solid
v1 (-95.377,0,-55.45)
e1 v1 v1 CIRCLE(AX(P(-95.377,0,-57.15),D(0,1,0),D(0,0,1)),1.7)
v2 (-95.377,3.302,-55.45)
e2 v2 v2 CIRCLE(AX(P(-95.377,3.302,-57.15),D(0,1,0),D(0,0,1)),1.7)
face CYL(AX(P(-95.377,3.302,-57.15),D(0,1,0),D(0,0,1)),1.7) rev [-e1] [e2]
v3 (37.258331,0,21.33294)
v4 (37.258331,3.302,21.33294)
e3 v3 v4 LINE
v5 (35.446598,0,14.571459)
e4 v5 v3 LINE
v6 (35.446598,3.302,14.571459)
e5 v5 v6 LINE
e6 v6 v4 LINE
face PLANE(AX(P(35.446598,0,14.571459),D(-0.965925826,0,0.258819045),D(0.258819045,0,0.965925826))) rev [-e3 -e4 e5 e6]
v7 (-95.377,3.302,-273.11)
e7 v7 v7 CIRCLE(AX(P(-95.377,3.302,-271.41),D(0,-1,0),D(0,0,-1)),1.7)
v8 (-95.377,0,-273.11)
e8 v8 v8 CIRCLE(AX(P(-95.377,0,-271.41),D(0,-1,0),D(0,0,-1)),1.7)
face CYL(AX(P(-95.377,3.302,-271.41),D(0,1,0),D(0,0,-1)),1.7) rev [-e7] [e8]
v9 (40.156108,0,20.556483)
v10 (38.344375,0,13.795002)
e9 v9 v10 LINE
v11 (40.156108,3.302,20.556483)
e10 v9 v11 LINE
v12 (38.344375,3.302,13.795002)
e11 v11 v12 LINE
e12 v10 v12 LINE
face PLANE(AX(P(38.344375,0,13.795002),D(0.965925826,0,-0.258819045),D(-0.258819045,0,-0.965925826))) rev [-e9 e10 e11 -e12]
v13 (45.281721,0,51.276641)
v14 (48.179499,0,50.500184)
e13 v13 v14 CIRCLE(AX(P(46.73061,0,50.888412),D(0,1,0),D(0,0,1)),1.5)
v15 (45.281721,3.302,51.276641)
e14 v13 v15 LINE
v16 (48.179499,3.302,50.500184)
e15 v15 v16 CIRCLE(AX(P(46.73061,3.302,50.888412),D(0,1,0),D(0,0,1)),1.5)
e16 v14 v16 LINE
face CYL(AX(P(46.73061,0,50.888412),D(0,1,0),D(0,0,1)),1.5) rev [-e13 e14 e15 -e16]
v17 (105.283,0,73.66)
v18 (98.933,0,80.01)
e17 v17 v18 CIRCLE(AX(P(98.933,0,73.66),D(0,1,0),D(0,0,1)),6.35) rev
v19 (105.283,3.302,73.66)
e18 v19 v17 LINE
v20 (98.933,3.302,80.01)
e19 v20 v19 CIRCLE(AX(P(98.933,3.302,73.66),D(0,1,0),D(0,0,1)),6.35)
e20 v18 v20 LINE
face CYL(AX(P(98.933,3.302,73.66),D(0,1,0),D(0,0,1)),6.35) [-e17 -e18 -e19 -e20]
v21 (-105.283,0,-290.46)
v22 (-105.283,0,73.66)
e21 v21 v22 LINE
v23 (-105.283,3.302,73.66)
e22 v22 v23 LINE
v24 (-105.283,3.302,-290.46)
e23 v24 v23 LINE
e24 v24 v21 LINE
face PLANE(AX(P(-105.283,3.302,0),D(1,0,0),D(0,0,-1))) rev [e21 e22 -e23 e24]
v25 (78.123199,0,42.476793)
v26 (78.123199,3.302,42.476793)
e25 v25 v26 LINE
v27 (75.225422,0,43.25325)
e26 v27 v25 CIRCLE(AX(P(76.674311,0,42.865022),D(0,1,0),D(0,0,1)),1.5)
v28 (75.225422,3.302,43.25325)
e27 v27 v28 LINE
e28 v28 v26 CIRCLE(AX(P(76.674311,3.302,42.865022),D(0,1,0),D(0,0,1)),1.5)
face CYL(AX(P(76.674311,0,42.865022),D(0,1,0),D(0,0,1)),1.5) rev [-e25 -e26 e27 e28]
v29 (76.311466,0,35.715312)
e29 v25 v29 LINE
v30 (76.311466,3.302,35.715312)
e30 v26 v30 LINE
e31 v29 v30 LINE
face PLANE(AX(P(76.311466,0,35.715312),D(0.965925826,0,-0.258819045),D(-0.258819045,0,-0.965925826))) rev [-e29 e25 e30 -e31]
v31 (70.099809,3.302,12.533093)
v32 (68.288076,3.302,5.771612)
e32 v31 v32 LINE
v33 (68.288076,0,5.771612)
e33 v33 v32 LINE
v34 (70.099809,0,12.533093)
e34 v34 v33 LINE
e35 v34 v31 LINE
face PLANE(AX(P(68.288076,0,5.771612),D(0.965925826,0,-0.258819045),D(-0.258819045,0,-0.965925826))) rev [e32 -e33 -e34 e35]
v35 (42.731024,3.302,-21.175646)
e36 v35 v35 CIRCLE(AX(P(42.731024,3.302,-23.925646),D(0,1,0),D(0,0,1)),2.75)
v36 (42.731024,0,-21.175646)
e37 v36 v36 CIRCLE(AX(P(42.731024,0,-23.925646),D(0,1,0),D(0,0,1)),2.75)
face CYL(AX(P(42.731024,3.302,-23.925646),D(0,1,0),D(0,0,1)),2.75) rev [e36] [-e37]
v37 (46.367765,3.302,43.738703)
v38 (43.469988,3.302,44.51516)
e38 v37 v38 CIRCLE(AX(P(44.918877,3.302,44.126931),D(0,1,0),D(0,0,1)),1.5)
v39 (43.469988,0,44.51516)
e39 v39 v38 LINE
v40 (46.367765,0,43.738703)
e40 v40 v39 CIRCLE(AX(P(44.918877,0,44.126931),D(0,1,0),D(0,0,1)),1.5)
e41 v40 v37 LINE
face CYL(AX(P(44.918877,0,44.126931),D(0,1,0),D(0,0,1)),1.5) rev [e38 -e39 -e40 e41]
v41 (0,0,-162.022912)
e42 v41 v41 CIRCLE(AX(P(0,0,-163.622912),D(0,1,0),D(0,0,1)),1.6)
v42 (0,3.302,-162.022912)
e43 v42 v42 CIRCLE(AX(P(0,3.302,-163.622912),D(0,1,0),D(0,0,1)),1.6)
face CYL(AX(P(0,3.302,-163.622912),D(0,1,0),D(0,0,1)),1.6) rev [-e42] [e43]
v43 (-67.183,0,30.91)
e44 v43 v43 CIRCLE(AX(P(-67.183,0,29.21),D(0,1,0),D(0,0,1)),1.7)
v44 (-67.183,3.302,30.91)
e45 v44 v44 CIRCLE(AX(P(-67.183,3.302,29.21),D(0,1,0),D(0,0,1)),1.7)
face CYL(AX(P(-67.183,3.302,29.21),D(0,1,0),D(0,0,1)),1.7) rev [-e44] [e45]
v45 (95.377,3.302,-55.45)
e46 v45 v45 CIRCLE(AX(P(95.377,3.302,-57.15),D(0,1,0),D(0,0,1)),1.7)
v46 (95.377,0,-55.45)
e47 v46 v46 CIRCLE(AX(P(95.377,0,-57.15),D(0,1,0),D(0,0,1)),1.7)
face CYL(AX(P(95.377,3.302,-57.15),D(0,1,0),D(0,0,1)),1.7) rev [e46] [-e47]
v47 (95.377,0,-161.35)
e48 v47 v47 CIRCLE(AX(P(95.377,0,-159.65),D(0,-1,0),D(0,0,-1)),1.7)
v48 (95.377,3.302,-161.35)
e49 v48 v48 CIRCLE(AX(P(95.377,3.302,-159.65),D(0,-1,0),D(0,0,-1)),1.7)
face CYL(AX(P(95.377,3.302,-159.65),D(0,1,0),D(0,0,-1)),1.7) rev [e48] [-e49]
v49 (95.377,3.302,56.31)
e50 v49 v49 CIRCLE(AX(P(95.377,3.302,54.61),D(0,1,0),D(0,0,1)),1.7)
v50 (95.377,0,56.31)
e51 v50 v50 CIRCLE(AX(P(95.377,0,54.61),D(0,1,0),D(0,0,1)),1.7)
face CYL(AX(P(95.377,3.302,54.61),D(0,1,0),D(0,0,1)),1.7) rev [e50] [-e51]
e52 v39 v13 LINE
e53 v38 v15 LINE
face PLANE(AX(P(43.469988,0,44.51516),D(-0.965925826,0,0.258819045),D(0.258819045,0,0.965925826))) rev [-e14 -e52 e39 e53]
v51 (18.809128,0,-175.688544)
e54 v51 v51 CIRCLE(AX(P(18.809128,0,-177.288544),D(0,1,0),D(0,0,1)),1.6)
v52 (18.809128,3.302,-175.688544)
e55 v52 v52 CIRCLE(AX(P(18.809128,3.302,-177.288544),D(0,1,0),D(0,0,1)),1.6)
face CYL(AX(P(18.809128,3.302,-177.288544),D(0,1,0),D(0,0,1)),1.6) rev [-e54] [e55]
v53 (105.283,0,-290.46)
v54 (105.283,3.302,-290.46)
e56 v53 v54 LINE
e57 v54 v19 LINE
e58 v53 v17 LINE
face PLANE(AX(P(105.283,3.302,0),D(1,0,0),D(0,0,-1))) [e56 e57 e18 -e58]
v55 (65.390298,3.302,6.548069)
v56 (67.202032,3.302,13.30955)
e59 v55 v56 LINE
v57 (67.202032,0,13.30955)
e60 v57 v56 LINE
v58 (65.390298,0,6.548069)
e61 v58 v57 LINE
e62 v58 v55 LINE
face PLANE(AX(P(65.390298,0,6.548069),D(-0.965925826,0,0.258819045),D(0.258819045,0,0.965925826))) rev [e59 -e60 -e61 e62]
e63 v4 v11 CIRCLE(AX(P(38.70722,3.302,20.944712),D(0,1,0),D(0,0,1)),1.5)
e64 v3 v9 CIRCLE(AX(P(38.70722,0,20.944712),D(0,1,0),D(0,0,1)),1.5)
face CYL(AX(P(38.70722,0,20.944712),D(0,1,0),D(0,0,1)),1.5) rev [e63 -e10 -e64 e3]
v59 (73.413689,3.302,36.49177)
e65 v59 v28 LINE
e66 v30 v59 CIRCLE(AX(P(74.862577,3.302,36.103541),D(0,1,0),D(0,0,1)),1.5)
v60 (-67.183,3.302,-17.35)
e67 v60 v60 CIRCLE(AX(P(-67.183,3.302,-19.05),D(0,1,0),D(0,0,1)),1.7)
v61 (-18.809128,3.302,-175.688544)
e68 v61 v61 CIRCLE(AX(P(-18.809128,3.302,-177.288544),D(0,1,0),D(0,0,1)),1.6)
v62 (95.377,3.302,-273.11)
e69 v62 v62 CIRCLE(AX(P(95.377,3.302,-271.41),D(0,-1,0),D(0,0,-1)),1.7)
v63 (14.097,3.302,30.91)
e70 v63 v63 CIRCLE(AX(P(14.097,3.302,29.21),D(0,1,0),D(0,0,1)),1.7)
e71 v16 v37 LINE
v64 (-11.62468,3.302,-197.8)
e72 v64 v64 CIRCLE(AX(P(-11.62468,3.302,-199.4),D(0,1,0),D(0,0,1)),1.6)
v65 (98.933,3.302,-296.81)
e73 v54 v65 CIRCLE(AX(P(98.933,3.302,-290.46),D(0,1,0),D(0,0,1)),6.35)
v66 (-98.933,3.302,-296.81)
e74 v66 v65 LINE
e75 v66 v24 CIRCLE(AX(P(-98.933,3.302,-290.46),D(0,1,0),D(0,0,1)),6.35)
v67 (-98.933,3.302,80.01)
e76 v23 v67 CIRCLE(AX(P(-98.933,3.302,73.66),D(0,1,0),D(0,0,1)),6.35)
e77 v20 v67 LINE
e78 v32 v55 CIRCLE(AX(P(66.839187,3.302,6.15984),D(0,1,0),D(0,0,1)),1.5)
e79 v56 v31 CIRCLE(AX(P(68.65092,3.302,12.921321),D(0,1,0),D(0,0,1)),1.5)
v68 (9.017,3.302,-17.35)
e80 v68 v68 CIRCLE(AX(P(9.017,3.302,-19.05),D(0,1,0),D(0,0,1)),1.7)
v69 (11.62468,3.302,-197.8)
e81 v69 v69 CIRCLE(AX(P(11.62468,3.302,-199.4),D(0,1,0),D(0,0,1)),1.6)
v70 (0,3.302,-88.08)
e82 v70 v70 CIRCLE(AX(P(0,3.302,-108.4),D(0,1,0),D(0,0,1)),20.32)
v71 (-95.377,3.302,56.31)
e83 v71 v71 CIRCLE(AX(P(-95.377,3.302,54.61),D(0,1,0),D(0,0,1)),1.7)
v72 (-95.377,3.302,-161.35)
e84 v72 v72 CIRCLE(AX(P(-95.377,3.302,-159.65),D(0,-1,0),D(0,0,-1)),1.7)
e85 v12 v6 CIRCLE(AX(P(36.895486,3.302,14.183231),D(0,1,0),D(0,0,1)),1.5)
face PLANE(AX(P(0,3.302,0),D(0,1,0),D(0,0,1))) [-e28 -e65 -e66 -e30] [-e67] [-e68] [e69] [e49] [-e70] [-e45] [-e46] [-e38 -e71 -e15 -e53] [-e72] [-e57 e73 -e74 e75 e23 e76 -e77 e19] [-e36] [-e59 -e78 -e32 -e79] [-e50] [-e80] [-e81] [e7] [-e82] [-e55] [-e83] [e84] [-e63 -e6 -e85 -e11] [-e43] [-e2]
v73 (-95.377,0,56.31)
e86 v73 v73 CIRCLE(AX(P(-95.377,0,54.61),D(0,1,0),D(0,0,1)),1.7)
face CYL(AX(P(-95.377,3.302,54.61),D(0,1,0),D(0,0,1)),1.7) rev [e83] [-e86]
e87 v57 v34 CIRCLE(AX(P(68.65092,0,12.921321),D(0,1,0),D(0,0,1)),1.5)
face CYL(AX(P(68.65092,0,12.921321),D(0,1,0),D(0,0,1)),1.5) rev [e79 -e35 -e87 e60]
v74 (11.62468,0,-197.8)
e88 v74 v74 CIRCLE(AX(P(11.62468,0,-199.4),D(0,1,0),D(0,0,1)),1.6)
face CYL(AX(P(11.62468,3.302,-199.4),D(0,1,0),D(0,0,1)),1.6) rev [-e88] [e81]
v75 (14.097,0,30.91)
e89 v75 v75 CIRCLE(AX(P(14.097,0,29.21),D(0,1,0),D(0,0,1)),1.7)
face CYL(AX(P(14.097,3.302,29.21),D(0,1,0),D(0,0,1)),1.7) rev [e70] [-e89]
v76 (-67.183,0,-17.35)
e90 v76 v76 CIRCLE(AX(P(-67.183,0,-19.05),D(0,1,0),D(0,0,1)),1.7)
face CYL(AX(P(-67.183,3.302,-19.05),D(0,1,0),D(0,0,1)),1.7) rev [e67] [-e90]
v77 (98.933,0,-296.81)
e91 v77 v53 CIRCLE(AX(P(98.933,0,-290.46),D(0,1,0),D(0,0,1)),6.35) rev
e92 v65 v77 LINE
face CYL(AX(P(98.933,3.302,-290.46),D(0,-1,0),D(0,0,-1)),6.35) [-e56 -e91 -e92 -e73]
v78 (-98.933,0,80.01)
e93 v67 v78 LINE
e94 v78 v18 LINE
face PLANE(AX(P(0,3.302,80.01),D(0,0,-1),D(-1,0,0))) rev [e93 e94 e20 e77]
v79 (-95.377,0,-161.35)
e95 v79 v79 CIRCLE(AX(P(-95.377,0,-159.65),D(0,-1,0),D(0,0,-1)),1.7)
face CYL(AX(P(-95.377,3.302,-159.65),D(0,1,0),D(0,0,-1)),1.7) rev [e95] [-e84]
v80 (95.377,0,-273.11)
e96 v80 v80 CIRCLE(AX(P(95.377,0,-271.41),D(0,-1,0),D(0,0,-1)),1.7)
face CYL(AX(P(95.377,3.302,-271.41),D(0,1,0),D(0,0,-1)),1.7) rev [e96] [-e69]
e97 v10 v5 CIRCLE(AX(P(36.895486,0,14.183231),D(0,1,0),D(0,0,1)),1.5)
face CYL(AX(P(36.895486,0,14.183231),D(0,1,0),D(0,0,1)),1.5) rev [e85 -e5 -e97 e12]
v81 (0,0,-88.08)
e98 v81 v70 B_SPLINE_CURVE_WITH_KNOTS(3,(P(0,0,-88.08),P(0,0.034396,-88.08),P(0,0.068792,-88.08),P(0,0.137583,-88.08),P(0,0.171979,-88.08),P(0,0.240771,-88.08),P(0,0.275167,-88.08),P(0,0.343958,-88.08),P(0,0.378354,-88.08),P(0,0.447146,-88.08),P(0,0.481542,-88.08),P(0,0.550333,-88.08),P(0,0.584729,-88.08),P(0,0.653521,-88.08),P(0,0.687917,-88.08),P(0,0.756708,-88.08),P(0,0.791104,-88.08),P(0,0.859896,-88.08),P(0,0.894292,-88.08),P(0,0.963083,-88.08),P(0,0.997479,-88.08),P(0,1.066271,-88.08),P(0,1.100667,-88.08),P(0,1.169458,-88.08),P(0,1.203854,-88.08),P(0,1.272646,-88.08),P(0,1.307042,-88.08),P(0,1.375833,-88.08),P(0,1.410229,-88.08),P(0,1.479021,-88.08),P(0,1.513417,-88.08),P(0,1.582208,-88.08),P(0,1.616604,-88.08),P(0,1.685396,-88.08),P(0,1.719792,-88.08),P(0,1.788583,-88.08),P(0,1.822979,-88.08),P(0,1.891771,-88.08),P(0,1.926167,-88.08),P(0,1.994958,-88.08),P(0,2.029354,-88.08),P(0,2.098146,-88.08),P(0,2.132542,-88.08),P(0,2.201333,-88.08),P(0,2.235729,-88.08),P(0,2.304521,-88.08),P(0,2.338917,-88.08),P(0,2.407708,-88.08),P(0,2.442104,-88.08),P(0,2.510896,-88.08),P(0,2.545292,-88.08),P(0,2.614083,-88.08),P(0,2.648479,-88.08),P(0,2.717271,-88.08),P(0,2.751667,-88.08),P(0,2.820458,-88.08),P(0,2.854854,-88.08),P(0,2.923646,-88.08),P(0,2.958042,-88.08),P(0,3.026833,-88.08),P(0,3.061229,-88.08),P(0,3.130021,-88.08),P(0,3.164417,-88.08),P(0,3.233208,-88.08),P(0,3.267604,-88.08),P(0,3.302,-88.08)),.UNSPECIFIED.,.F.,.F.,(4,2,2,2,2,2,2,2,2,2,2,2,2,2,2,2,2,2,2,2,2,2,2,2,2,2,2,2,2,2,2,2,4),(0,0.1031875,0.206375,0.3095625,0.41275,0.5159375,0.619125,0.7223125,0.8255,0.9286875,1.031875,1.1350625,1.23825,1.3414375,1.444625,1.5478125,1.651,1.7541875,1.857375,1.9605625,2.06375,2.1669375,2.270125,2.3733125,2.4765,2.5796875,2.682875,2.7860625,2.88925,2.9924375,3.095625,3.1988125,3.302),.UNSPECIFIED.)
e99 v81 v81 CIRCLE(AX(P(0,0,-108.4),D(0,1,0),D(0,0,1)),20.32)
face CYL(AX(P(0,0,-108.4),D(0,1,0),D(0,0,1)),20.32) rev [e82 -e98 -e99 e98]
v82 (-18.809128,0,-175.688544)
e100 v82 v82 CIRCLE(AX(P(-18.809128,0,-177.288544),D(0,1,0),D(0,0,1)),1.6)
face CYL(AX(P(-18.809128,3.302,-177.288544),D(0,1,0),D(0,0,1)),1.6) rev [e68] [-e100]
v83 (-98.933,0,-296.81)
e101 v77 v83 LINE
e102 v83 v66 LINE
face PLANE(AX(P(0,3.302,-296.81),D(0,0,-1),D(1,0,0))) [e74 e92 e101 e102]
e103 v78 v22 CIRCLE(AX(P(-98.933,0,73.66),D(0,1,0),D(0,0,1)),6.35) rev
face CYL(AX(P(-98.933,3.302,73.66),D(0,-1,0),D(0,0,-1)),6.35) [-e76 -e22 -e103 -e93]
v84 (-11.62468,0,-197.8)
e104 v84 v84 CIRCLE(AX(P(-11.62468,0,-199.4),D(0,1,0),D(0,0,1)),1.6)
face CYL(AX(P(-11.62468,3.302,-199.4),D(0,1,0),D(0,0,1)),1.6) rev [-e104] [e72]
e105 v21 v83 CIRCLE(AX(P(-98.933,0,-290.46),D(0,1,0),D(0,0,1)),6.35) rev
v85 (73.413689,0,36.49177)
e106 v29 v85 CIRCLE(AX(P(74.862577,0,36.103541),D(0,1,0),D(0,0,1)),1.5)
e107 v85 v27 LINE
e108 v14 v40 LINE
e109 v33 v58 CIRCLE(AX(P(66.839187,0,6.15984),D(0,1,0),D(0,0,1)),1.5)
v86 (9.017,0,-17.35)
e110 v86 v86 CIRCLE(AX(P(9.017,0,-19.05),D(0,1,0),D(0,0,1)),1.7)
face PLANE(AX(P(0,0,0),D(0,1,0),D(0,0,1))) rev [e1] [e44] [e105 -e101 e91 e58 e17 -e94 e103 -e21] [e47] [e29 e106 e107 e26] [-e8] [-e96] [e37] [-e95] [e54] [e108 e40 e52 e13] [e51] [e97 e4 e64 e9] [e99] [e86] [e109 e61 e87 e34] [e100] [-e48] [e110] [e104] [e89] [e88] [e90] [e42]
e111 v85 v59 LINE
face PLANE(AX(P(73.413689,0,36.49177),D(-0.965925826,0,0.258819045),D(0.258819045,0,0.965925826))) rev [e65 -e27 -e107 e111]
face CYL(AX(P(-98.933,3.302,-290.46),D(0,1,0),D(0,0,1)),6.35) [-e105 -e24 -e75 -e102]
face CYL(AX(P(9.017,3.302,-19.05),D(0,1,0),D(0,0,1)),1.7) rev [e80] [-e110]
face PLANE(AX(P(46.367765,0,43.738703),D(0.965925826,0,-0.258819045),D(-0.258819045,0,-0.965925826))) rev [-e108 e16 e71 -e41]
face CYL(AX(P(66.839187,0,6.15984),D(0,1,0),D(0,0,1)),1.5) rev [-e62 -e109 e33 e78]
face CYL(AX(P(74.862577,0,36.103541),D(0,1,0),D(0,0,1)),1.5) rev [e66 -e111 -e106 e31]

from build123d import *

# Parameters (mm, degrees)
BOSS_EXTRUDE1_DEPTH     = 3.302
M3_CLEARANCE_HOLE1_D    = 3.4
SKETCH6_W               = 210.566
SKETCH6_H               = 3.302
BOSS_EXTRUDE3_DEPTH     = 1.62
SKETCH7_W               = 210.566
SKETCH7_H               = 3.302
BOSS_EXTRUDE4_DEPTH     = 5.18
M3_CLEARANCE_HOLE2_D    = 3.4
SKETCH21_R              = 20.32
CUT_EXTRUDE1_DEPTH      = 336.371396057
ADVANCEDHOLE1_OUTLINE_R = 1.6
ADVANCEDHOLE1_DEPTH     = 3.302
CUT_EXTRUDE2_REACH      = 337.371
SKETCH33_W              = 167.386
SKETCH33_H              = 21.59
FILLET1_R               = 6.35
CUT_EXTRUDE3_DEPTH      = 315.946962825
M5_CLEARANCE_HOLE1_D    = 5.5
M3_CLEARANCE_HOLE3_D    = 3.4


# Read off the part's stored shape, not the designer's step: AdvancedHole1
with BuildPart() as part:
    # Sketch1 → Boss-Extrude1 (new body)
    with BuildSketch(Plane(origin=(0, 0, 0), x_dir=(1, 0, 0), z_dir=(0, 1, 0))):
        Polygon((105.283, -80.01), (105.283, 101.6), (-105.283, 101.6), (-105.283, -80.01), (-83.693, -80.01), (-83.693, -101.6), (83.693, -101.6), (83.693, -80.01), align=None)
    extrude(amount=BOSS_EXTRUDE1_DEPTH)

    # M3 Clearance Hole1 (through all)
    with Locations(Plane(origin=(0, 3.302, 0), x_dir=(1, 0, 0), z_dir=(0, 1, 0))):
        with Locations((-95.377, -54.61), (-95.377, 57.15), (95.377, 57.15), (95.377, -54.61)):
            Hole(M3_CLEARANCE_HOLE1_D / 2)

    # Sketch6 → Boss-Extrude3 (add)
    with BuildSketch(Plane(origin=(0, 0, -101.6), x_dir=(-1, 0, 0), z_dir=(0, 0, -1))):
        with Locations((0, 1.651)):
            Rectangle(SKETCH6_W, SKETCH6_H)
    extrude(amount=BOSS_EXTRUDE3_DEPTH)

    # Sketch7 → Boss-Extrude4 (add)
    with BuildSketch(Plane(origin=(0, 0, -103.22), x_dir=(-1, 0, 0), z_dir=(0, 0, -1))):
        with Locations((0, 1.651)):
            Rectangle(SKETCH7_W, SKETCH7_H)
    extrude(amount=BOSS_EXTRUDE4_DEPTH)


with BuildPart() as body_2:
    # Mirror2: mirrored copy
    add(part.part.mirror(Plane(origin=(0, 0, -108.4), x_dir=(1, 0, 0), z_dir=(0, 0, -1))))


with BuildPart() as part_1:
    add(part.part)

    # Combine1: union body 2
    add(body_2.part)

    # M3 Clearance Hole2 (through all)
    with Locations(Plane(origin=(0, 3.302, 0), x_dir=(1, 0, 0), z_dir=(0, 1, 0))):
        with Locations((-58.293, -91.6), (58.293, -91.6), (-58.293, 308.4), (58.293, 308.4)):
            Hole(M3_CLEARANCE_HOLE2_D / 2)

    # Sketch21 → Cut-Extrude1 (cut, through all)
    with BuildSketch(Plane(origin=(0, 3.302, 0), x_dir=(1, 0, 0), z_dir=(0, 1, 0))):
        with Locations(Location((0, 108.4, 0), (0, 0, 270))):
            Circle(SKETCH21_R)
    extrude(amount=-CUT_EXTRUDE1_DEPTH, mode=Mode.SUBTRACT)

    # AdvancedHole1 outline → AdvancedHole1 (cut)
    with BuildSketch(Plane(origin=(0, 0, 0), x_dir=(1, 0, 0), z_dir=(0, 1, 0))):
        with Locations((-11.624680448, 199.4)):
            Circle(ADVANCEDHOLE1_OUTLINE_R)
        with Locations((-18.809128073, 177.28854382)):
            Circle(ADVANCEDHOLE1_OUTLINE_R)
        with Locations((0, 163.62291236)):
            Circle(ADVANCEDHOLE1_OUTLINE_R)
        with Locations((18.809128073, 177.28854382)):
            Circle(ADVANCEDHOLE1_OUTLINE_R)
        with Locations((11.624680448, 199.4)):
            Circle(ADVANCEDHOLE1_OUTLINE_R)
    extrude(amount=ADVANCEDHOLE1_DEPTH, mode=Mode.SUBTRACT)

    # Sketch33 → Cut-Extrude2 (cut, up to next)
    with BuildSketch(Plane(origin=(0, 3.302, 0), x_dir=(1, 0, 0), z_dir=(0, 1, 0)), mode=Mode.PRIVATE) as cut_extrude2_sk1:
        with Locations((0, 307.605)):
            Rectangle(SKETCH33_W, SKETCH33_H)
    cut_extrude2_tool1 = extrude(cut_extrude2_sk1.sketch, amount=-CUT_EXTRUDE2_REACH, mode=Mode.PRIVATE) & part_1.part
    # Sketch33 → Cut-Extrude2 (cut, up to next)
    with BuildSketch(Plane(origin=(0, 3.302, 0), x_dir=(1, 0, 0), z_dir=(0, 1, 0)), mode=Mode.PRIVATE) as cut_extrude2_sk2:
        with Locations((0, -90.805)):
            Rectangle(SKETCH33_W, SKETCH33_H)
    cut_extrude2_tool2 = extrude(cut_extrude2_sk2.sketch, amount=-CUT_EXTRUDE2_REACH, mode=Mode.PRIVATE) & part_1.part
    add(cut_extrude2_tool1.solids().sort_by_distance((0, 3.302, -307.605))[0], mode=Mode.SUBTRACT)
    add(cut_extrude2_tool2.solids().sort_by_distance((0, 3.302, 90.805))[0], mode=Mode.SUBTRACT)

    # Fillet1
    fillet1_edges = [part_1.edges().sort_by_distance(p)[0] for p in [
        (-105.283, 1.651, 80.01),
        (105.283, 1.651, 80.01),
        (105.283, 1.651, -296.81),
        (-105.283, 1.651, -296.81),
    ]]
    fillet(fillet1_edges, radius=FILLET1_R)

    # Sketch24 → Cut-Extrude3 (cut, through all)
    with BuildSketch(Plane(origin=(0, 3.302, 0), x_dir=(1, 0, 0), z_dir=(0, 1, 0))):
        with BuildLine():
            Line((68.288075685, -5.771611822), (70.099809001, -12.533092606))
            ThreePointArc((70.099809001, -12.533092606), (69.039148829, -14.370209913), (67.202031522, -13.309549741))
            Line((67.202031522, -13.309549741), (65.390298207, -6.548068957))
            ThreePointArc((65.390298207, -6.548068957), (66.450958378, -4.71095165), (68.288075685, -5.771611822))
        make_face()
        with BuildLine():
            Line((76.311466084, -35.715312437), (78.123199399, -42.476793221))
            ThreePointArc((78.123199399, -42.476793221), (77.062539228, -44.313910528), (75.22542192, -43.253250356))
            Line((75.22542192, -43.253250356), (73.413688605, -36.491769572))
            ThreePointArc((73.413688605, -36.491769572), (74.474348777, -34.654652265), (76.311466084, -35.715312437))
        make_face()
        with BuildLine():
            Line((38.34437507, -13.79500222), (40.156108386, -20.556483004))
            ThreePointArc((40.156108386, -20.556483004), (39.095448214, -22.393600311), (37.258330907, -21.332940139))
            Line((37.258330907, -21.332940139), (35.446597592, -14.571459355))
            ThreePointArc((35.446597592, -14.571459355), (36.507257763, -12.734342048), (38.34437507, -13.79500222))
        make_face()
        with BuildLine():
            Line((46.367765469, -43.738702835), (48.179498784, -50.500183619))
            ThreePointArc((48.179498784, -50.500183619), (47.118838613, -52.337300926), (45.281721306, -51.276640754))
            Line((45.281721306, -51.276640754), (43.46998799, -44.51515997))
            ThreePointArc((43.46998799, -44.51515997), (44.530648162, -42.678042663), (46.367765469, -43.738702835))
        make_face()
    extrude(amount=-CUT_EXTRUDE3_DEPTH, mode=Mode.SUBTRACT)

    # M5 Clearance Hole1 (through all)
    with Locations(Plane(origin=(0, 3.302, 0), x_dir=(1, 0, 0), z_dir=(0, 1, 0))):
        with Locations((42.731024346, 23.92564608)):
            Hole(M5_CLEARANCE_HOLE1_D / 2)

    # M3 Clearance Hole3 (through all)
    with Locations(Plane(origin=(0, 3.302, 0), x_dir=(1, 0, 0), z_dir=(0, 1, 0))):
        with Locations((9.017, 19.05), (14.097, -29.21), (-67.183, 19.05), (-67.183, -29.21)):
            Hole(M3_CLEARANCE_HOLE3_D / 2)


solid = part_1.part
